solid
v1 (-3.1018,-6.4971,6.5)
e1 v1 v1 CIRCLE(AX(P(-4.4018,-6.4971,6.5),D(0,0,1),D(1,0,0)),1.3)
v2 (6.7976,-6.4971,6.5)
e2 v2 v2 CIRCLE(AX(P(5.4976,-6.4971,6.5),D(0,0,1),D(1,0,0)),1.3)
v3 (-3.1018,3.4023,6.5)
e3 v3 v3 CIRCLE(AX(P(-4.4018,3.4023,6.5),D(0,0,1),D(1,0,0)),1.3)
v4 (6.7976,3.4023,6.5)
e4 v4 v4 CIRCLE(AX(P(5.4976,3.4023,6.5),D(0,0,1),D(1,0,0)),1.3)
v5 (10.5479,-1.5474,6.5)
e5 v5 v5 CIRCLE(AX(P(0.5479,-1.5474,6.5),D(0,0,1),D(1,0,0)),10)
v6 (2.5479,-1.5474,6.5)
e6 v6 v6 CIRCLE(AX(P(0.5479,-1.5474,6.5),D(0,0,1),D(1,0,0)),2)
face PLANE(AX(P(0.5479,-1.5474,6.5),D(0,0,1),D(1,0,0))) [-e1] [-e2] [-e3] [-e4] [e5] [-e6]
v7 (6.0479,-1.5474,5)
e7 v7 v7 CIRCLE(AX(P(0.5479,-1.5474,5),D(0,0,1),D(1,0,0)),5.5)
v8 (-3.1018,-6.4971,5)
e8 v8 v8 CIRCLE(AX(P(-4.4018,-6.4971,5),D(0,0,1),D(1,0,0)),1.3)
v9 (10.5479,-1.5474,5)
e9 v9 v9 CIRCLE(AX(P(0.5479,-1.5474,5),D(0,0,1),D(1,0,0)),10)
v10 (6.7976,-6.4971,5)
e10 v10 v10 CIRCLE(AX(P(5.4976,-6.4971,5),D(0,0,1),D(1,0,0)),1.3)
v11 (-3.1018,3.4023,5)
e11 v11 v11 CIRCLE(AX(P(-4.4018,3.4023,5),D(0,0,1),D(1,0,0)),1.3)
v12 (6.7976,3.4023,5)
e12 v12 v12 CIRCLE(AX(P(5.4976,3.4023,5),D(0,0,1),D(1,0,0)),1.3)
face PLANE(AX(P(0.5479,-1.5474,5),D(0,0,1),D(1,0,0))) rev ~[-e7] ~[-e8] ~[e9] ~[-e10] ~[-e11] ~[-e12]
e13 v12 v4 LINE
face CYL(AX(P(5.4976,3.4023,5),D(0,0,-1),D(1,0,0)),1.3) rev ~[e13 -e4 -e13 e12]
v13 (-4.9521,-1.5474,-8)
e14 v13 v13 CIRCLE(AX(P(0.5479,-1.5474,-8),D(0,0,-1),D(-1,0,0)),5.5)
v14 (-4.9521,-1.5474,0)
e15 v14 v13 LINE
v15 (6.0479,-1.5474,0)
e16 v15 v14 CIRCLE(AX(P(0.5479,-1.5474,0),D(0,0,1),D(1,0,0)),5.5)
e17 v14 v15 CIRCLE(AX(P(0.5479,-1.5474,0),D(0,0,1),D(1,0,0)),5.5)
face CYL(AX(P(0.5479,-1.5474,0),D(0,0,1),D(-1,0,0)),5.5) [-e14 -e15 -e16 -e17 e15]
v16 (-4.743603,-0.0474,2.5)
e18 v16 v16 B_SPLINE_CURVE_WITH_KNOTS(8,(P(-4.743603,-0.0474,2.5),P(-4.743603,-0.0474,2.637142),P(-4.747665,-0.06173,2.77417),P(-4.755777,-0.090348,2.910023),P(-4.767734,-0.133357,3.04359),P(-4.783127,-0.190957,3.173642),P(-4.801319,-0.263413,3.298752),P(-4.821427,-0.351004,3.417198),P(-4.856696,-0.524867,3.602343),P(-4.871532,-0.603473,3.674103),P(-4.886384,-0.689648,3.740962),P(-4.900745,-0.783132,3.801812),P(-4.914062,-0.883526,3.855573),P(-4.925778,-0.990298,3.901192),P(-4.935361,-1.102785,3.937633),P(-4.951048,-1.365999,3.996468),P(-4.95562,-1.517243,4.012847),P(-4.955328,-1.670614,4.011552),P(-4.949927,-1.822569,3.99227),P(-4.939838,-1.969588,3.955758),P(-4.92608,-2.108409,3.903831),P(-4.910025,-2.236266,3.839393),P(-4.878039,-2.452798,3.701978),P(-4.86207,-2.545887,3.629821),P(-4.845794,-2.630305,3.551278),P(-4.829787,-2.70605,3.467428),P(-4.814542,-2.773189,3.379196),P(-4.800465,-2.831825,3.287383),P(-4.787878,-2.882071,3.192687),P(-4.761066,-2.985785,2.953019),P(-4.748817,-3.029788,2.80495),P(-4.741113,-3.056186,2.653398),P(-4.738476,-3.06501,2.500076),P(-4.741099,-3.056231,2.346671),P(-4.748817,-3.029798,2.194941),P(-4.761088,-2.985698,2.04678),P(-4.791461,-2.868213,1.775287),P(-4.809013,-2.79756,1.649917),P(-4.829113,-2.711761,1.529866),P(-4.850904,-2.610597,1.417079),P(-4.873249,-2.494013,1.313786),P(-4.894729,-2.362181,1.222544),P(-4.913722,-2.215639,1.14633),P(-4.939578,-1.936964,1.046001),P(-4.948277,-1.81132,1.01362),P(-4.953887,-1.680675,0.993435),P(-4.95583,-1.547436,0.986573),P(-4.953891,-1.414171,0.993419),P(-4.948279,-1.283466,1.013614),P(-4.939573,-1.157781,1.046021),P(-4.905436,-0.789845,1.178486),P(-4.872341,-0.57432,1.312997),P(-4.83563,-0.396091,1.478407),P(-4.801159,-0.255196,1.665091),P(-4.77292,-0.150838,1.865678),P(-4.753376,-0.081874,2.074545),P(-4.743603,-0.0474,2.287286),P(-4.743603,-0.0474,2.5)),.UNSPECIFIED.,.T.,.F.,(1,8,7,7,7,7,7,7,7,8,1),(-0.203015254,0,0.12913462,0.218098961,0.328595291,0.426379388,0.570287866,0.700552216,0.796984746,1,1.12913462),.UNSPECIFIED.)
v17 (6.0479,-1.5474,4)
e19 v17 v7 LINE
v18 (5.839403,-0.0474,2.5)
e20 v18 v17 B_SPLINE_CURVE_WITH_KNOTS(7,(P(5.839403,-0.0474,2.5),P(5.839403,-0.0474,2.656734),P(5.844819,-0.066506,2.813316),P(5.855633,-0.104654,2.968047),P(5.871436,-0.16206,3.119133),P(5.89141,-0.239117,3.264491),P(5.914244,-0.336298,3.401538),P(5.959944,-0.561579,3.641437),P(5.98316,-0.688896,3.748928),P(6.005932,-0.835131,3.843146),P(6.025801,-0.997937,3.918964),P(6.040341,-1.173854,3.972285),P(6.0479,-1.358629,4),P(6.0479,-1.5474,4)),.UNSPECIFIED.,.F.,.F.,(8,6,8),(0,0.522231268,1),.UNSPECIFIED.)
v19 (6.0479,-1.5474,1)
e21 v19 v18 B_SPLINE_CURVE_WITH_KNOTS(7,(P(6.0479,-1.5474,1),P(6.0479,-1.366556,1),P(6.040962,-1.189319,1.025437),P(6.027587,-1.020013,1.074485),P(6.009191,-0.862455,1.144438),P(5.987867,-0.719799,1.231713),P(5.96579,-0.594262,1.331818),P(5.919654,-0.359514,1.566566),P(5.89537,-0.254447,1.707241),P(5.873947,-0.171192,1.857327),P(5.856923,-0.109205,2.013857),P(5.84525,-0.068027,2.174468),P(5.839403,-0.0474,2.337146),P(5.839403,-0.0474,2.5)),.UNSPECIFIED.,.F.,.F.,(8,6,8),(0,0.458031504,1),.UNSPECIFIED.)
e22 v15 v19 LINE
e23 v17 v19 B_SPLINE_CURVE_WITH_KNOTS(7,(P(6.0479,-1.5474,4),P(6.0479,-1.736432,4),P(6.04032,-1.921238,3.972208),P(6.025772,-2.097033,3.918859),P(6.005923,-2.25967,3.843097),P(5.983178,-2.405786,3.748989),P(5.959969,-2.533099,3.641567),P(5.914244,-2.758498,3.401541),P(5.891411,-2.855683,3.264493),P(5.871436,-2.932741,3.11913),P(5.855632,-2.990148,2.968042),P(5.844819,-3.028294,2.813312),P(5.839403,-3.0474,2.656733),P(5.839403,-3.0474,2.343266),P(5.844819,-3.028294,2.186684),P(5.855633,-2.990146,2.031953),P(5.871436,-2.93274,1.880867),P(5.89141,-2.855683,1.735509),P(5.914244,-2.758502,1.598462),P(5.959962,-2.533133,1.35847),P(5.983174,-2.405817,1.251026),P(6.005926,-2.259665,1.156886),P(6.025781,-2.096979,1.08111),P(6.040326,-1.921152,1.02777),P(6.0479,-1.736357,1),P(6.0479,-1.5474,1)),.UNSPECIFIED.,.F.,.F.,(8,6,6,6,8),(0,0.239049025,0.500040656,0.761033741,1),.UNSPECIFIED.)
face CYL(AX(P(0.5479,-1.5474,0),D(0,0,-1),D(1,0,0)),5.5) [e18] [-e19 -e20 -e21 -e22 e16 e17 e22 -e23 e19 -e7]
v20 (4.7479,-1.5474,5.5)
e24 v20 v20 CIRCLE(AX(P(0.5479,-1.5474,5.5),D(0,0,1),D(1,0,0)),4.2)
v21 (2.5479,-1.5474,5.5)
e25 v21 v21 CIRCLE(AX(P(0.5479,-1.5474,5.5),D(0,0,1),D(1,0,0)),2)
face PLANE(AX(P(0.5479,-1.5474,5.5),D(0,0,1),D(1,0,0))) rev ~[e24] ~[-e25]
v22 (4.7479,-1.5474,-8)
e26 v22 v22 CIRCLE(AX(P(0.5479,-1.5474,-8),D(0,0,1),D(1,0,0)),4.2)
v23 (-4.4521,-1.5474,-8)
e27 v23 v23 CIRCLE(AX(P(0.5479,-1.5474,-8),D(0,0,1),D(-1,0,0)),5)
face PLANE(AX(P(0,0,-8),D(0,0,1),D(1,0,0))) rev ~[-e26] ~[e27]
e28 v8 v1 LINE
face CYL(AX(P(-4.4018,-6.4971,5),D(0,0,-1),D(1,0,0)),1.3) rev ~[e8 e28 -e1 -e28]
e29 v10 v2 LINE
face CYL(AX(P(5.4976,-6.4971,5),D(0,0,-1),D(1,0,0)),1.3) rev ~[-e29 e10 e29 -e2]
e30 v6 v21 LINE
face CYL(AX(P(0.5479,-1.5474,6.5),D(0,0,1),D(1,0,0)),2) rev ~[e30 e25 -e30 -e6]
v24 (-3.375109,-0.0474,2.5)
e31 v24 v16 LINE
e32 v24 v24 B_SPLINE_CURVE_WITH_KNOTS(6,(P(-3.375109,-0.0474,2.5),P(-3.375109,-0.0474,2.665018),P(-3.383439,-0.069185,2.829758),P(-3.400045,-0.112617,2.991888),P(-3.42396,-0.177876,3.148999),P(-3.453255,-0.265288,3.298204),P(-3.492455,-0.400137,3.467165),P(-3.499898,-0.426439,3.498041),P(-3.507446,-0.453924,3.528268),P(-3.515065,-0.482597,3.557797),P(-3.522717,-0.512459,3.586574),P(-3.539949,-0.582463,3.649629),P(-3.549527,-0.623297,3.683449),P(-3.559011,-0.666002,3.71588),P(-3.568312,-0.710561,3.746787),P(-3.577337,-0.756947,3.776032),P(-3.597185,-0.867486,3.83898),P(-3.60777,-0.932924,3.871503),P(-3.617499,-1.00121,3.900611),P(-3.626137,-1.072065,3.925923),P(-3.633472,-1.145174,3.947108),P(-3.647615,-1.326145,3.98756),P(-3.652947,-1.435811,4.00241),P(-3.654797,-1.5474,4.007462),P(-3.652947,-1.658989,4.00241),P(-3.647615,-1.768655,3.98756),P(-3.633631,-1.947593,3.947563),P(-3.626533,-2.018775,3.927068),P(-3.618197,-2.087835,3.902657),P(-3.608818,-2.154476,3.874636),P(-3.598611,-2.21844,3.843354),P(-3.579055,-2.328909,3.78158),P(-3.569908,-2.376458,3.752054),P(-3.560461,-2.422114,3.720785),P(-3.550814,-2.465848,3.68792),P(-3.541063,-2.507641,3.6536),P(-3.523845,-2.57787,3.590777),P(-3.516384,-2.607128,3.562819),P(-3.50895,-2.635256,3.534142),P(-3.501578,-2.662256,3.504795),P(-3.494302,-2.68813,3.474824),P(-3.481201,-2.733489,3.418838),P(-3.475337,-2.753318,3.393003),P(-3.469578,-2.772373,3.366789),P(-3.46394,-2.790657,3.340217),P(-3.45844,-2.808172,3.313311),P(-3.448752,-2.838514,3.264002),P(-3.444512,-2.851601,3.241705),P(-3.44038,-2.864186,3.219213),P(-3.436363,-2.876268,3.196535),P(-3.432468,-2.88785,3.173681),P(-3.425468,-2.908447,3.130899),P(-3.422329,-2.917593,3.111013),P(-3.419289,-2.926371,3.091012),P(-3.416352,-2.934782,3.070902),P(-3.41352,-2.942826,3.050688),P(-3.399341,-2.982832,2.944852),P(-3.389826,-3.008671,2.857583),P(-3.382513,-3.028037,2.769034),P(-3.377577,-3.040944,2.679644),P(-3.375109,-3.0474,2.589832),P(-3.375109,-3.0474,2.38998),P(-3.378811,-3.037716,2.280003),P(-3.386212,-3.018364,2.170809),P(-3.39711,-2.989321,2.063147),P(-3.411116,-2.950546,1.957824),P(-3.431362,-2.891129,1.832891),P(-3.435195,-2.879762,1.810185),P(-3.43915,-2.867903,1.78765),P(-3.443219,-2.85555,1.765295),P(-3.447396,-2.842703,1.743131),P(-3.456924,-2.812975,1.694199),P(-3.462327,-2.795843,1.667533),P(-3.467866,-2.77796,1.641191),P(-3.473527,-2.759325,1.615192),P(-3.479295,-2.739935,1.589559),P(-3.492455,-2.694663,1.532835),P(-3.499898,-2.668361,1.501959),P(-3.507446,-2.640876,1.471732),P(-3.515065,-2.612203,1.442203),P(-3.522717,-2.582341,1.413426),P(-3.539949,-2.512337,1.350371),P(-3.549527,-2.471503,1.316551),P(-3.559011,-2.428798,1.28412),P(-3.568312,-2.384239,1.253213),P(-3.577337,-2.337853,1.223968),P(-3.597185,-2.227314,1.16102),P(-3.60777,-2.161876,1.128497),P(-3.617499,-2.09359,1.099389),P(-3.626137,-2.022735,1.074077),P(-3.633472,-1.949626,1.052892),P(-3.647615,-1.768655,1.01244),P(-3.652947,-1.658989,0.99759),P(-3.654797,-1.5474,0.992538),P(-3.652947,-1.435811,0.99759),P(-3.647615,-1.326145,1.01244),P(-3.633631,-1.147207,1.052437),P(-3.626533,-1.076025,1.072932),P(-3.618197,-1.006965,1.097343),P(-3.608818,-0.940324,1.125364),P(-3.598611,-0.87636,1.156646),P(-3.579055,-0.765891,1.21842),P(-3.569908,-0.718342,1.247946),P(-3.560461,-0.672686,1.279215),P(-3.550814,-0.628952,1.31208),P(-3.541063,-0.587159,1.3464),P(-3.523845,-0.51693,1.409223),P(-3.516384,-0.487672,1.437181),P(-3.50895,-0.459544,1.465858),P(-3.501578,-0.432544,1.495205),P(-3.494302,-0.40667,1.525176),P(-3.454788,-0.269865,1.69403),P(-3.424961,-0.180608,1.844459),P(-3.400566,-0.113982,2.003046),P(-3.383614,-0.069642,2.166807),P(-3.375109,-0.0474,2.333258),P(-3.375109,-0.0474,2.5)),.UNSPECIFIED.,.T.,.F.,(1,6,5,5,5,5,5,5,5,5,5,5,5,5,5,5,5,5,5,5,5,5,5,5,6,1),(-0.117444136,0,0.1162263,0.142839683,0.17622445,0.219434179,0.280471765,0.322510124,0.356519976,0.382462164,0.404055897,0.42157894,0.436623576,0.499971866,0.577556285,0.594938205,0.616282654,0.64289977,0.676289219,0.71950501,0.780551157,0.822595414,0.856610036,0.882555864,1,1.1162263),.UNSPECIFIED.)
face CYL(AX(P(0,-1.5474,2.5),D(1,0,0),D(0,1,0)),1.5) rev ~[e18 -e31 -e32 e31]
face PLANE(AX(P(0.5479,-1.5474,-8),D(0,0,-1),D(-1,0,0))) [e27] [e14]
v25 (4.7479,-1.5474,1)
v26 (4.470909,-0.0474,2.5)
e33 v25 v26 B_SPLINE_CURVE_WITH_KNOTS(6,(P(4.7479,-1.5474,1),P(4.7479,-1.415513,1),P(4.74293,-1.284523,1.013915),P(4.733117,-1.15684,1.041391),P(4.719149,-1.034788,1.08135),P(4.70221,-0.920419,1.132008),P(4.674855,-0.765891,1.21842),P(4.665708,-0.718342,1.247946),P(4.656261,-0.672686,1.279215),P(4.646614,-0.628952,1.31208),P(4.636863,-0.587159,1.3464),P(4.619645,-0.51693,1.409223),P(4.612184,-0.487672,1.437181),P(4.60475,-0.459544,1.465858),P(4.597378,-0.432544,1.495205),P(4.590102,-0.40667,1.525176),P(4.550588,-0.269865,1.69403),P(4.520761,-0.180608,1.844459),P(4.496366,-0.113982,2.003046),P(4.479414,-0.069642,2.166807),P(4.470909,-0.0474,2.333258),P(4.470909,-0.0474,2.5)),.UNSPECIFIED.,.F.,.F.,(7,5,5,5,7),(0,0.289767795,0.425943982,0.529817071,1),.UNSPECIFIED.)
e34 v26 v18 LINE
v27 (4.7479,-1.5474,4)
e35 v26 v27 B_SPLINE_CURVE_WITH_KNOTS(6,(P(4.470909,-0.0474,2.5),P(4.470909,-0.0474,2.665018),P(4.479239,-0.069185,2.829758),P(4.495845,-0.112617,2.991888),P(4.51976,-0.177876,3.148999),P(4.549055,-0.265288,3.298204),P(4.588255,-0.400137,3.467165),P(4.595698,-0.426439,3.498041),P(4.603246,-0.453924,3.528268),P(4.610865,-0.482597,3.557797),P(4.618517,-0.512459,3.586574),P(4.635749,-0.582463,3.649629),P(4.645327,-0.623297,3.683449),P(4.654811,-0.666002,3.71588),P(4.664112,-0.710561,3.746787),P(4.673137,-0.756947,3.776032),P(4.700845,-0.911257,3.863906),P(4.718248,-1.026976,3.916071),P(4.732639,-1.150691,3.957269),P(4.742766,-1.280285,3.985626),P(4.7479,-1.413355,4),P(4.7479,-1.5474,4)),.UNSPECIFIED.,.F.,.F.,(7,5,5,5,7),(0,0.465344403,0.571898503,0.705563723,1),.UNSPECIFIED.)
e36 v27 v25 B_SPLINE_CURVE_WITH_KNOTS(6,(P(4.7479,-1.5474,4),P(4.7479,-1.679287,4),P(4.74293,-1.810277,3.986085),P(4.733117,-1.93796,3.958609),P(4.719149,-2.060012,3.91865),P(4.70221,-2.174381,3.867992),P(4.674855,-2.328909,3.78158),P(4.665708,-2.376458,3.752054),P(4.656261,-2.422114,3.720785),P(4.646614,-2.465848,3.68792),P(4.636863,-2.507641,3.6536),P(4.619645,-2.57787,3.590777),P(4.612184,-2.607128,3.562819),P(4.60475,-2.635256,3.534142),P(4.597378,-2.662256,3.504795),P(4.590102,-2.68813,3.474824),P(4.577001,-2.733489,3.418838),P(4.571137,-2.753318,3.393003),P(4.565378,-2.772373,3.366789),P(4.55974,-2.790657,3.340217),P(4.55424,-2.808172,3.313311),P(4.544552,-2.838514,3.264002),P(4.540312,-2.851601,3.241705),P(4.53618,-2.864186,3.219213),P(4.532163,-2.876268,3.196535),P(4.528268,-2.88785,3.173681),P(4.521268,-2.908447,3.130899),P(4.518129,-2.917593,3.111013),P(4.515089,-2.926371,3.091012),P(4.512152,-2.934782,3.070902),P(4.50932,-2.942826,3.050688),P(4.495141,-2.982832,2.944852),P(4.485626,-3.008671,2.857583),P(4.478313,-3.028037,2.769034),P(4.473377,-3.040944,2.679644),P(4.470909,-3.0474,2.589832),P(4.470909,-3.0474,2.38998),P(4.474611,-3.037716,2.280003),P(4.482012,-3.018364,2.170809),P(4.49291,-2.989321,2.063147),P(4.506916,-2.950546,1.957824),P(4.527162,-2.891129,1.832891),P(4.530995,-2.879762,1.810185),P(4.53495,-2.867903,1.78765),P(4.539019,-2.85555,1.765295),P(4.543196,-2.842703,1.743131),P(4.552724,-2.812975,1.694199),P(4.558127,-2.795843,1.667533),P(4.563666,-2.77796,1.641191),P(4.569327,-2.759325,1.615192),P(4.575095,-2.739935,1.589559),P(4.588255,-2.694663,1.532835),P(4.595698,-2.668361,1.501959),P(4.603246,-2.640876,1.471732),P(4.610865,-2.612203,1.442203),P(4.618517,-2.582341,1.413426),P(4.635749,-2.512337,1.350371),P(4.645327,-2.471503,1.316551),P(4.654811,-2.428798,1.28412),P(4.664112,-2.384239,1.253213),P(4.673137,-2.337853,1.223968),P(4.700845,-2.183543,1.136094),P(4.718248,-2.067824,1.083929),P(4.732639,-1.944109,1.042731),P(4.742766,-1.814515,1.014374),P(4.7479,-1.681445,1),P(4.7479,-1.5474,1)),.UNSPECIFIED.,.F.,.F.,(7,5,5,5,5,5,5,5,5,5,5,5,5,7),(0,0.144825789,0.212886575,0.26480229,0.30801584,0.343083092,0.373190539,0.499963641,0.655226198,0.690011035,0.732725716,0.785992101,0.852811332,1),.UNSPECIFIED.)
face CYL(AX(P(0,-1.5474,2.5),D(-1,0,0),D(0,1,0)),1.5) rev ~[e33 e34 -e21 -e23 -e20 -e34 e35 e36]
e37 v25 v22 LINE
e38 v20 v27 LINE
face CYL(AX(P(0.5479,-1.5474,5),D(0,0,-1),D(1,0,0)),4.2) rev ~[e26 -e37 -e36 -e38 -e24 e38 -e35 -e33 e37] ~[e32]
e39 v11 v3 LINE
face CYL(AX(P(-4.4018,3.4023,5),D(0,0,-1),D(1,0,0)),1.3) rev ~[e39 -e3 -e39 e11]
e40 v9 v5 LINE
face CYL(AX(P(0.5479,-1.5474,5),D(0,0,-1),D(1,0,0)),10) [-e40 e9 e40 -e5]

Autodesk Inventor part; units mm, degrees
ref_plane "YZ Plane" through (0, 0, 0) normal (1, 0, 0) x (0, 1, 0)
ref_plane "XZ Plane" through (0, 0, 0) normal (0, 1, 0) x (-1, 0, 0)
ref_plane "XY Plane" through (0, 0, 0) normal (0, 0, 1) x (1, 0, 0)
sketch "스케치1" plane through (0, 0, 0) normal (0, 0, 1) x (1, 0, 0)
  circle A0 centre (0.5479, -1.5474) radius 5.5
  circle A1 centre (0.5479, -1.5474) radius 5
  circle A2 centre (0.5479, -1.5474) radius 4.2
  ellipse E0 centre (0.5479, -1.5474) end of major axis (-0.0909, -9.0201) minor radius 7.4992
  ellipse E1 centre (0.5479, -1.5474) end of major axis (-0.0912, -9.0201) minor radius 7.4991
  ellipse E2 centre (0.5479, -1.5474) end of major axis (1.2999, 2.3813) minor radius 3.9993 (-3.4513, -1.5143) -> (4.5471, -1.5804) ccw projected
  dimension "d0" = 10
  dimension "d1" = 8.4
  dimension "d24" = 11
extrude "돌출1" add sketch "스케치1" against normal blind 8 contours A1
sketch "스케치2" plane through (0.5479, -1.5474, 0) normal (0, 0, 1) x (1, 0, 0)
  circle A0 centre (0, 0) radius 4.2 projected
  circle A1 centre (0, 0) radius 5.5
  dimension "d4" = 11
extrude "돌출2" add sketch "스케치2" along normal blind 5
sketch "스케치3" plane through (0.5479, -1.5474, 5) normal (0, 0, 1) x (1, 0, 0)
  circle A0 centre (0, 0) radius 5.5 projected
  circle A1 centre (0, 0) radius 4.2 projected
  circle A2 centre (0, 0) radius 10
  circle A3 centre (4.9497, -4.9497) radius 1.3
  circle A4 centre (0, 0) radius 5 projected
  line L0 (0, 0) -> (0, -5.5) construction
  circle A5 centre (4.9497, 4.9497) radius 1.3
  circle A6 centre (-4.9497, 4.9497) radius 1.3
  circle A7 centre (-4.9497, -4.9497) radius 1.3
  dimension "d9" = 20
  dimension "d10" = 2.6
  dimension "d11" = 7
  dimension "d12" = 45
  dimension "d15" = 360
extrude "돌출3" add sketch "스케치3" along normal blind 1.5 contours A0 | A2 | A4
sketch "스케치4" plane through (0.5479, -1.5474, 6.5) normal (0, 0, 1) x (1, 0, 0)
  circle A0 centre (0, 0) radius 4.2 projected
  circle A1 centre (0, 0) radius 2
  dimension "d17" = 4
extrude "돌출4" add sketch "스케치4" against normal blind 1
sketch "스케치5" plane through (0, 0, 0) normal (1, 0, 0) x (0, 1, 0)
  circle A0 centre (-1.5474, 2.5) radius 1.5
  line L0 (3.9526, 0) -> (-7.0474, 0) projected
  line L1 (3.9526, 5) -> (-7.0474, 5) projected
  line L2 (3.9526, 0) -> (-7.0474, 0) projected
  line L3 (-7.0474, 0) -> (-7.0474, 5) projected
  line L4 (3.9526, 0) -> (3.9526, 5) projected
  point P0 (0, 0)
  point P1 (-1.5474, 5)
  dimension "d20" = 3
  dimension "d21" = 2.5
extrude "돌출5" cut sketch "스케치5" along normal through all both and the other way through all contours A0
sketch "스케치6" plane through (0.5479, -1.5474, 0) normal (0, 0, -1) x (-1, 0, 0)
  circle A0 centre (0, 0) radius 5.5 projected
  circle A1 centre (0, 0) radius 5 projected
  point P0 (0.5479, 1.5474)
extrude "돌출6" add sketch "스케치6" along normal blind 8
properties part number "motor_clamp"
